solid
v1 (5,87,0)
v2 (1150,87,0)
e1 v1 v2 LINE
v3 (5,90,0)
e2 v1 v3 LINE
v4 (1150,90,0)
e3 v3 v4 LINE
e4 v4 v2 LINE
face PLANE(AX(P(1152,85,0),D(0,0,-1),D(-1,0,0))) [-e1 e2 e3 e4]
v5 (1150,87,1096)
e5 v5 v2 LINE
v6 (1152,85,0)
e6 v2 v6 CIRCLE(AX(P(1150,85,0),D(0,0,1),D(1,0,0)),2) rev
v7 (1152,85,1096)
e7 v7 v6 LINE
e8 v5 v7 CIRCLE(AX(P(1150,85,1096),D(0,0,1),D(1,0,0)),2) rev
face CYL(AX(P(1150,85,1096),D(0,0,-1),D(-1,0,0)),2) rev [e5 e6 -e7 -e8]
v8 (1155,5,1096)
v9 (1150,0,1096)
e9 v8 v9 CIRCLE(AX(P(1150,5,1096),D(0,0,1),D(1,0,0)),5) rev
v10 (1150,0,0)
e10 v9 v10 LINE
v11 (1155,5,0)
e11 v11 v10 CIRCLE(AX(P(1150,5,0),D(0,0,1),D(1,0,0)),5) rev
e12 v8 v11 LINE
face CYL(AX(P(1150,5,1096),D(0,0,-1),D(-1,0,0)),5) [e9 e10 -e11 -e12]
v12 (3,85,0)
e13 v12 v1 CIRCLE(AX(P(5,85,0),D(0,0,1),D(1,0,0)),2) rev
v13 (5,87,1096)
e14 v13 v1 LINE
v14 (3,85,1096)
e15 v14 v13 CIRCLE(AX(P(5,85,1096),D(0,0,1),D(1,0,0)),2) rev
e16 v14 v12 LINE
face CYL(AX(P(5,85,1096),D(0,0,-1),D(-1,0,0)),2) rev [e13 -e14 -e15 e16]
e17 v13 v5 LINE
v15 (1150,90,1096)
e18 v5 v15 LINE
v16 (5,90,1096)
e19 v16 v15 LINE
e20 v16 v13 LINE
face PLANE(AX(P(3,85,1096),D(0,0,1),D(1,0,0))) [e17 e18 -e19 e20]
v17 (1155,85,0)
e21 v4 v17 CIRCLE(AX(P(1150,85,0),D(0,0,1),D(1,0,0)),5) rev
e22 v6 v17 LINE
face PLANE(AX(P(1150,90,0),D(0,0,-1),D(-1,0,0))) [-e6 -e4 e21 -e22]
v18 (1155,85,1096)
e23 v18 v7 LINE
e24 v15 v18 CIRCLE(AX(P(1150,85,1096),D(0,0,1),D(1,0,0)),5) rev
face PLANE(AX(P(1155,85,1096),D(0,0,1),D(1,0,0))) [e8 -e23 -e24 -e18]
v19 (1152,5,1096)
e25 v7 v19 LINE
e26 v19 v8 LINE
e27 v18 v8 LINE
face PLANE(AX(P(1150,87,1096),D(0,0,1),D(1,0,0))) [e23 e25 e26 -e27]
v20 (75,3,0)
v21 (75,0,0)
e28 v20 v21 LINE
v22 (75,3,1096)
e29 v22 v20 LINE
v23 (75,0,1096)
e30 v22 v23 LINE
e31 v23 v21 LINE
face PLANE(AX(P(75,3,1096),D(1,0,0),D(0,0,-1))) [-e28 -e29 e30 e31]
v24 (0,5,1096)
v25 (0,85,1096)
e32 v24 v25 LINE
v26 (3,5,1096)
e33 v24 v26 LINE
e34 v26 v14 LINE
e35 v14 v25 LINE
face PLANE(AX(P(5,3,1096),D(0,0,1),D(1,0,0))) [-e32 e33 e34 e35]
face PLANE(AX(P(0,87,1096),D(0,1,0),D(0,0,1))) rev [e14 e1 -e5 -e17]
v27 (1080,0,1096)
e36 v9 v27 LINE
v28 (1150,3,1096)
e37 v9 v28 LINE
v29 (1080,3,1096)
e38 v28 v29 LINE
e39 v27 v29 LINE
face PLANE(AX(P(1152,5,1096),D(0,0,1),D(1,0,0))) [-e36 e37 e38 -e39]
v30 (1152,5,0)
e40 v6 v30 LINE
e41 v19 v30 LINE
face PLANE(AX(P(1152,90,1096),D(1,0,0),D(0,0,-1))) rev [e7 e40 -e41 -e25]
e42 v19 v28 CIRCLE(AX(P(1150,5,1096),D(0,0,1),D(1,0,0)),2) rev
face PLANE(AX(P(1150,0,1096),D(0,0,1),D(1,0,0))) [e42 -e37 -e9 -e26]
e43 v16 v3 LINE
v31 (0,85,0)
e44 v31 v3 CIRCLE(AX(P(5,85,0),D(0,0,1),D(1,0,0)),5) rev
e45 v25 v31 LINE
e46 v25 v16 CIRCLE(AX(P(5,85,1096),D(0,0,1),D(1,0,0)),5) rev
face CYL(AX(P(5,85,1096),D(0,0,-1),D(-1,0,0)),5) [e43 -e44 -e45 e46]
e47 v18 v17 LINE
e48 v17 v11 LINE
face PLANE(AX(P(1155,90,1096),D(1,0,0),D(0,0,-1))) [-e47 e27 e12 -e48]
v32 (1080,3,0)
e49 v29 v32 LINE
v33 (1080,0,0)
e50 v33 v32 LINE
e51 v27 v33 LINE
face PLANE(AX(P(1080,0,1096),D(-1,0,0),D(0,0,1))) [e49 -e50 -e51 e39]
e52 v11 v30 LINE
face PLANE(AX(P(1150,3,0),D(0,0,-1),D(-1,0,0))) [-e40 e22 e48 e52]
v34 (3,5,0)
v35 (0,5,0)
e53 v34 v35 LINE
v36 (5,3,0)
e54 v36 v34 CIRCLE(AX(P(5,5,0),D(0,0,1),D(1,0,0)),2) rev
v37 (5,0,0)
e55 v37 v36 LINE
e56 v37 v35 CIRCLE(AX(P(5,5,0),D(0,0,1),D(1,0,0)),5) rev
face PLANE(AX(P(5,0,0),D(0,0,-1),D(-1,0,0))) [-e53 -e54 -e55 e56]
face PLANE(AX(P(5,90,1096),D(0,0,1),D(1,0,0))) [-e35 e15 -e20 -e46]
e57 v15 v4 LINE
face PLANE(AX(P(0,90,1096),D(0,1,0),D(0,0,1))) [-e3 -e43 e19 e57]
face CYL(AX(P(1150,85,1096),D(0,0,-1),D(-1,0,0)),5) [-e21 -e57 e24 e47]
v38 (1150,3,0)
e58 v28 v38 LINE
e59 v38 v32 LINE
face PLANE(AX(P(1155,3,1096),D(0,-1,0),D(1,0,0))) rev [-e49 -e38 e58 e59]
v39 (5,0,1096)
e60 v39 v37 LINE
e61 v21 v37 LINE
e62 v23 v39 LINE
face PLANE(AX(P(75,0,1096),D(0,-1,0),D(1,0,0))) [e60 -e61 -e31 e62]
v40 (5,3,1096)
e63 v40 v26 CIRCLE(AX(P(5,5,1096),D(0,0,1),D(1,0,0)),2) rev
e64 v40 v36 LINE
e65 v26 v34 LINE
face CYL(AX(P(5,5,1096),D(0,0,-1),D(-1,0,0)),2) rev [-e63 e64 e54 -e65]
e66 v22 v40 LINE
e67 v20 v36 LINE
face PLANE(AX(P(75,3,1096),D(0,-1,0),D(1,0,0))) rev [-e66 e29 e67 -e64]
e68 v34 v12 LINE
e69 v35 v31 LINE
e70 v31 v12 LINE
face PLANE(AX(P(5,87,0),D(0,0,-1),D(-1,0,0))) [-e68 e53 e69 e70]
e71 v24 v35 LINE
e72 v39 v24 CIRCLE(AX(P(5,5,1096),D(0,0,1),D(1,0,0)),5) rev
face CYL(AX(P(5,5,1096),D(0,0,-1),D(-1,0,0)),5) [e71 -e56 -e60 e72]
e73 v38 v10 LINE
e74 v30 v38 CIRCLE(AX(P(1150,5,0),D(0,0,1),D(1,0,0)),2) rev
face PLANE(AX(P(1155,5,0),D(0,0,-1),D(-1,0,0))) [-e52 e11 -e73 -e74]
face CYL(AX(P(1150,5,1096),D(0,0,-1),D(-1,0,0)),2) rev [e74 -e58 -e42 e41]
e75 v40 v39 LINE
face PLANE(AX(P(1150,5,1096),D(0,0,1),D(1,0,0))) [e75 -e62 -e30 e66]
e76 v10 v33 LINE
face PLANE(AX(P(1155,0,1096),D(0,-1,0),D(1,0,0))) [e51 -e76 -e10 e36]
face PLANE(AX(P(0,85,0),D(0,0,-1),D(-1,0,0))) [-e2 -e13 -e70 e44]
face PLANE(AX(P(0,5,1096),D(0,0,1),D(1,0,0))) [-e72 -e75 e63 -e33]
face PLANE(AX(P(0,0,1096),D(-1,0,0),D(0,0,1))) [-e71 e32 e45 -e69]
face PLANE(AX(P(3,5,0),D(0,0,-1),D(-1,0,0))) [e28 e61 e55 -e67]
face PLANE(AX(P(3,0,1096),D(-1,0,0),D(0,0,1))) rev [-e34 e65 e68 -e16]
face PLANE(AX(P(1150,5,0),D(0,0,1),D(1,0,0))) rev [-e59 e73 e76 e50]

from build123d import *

# Parameters (mm, degrees)
BASE_FLANGE1_DEPTH = 1096


# Sheet-metal steps are written as plain solids
with BuildPart() as part:
    # Sketch1 → Base-Flange1 (new body)
    with BuildSketch(Plane.XY):
        with BuildLine():
            Line((75, 0), (5, 0))
            ThreePointArc((5, 0), (1.464466094, 1.464466094), (0, 5))
            Line((0, 5), (0, 85))
            ThreePointArc((0, 85), (1.464466094, 88.535533906), (5, 90))
            Line((5, 90), (1150, 90))
            ThreePointArc((1150, 90), (1153.535533906, 88.535533906), (1155, 85))
            Line((1155, 85), (1155, 5))
            ThreePointArc((1155, 5), (1153.535533906, 1.464466094), (1150, 0))
            Line((1150, 0), (1080, 0))
            Line((1080, 0), (1080, 3))
            Line((1080, 3), (1150, 3))
            ThreePointArc((1150, 3), (1151.414213562, 3.585786438), (1152, 5))
            Line((1152, 5), (1152, 85))
            ThreePointArc((1152, 85), (1151.414213562, 86.414213562), (1150, 87))
            Line((1150, 87), (5, 87))
            ThreePointArc((5, 87), (3.585786438, 86.414213562), (3, 85))
            Line((3, 85), (3, 5))
            ThreePointArc((3, 5), (3.585786438, 3.585786438), (5, 3))
            Line((5, 3), (75, 3))
            Line((75, 3), (75, 0))
        make_face()
    extrude(amount=BASE_FLANGE1_DEPTH)


solid = part.part
